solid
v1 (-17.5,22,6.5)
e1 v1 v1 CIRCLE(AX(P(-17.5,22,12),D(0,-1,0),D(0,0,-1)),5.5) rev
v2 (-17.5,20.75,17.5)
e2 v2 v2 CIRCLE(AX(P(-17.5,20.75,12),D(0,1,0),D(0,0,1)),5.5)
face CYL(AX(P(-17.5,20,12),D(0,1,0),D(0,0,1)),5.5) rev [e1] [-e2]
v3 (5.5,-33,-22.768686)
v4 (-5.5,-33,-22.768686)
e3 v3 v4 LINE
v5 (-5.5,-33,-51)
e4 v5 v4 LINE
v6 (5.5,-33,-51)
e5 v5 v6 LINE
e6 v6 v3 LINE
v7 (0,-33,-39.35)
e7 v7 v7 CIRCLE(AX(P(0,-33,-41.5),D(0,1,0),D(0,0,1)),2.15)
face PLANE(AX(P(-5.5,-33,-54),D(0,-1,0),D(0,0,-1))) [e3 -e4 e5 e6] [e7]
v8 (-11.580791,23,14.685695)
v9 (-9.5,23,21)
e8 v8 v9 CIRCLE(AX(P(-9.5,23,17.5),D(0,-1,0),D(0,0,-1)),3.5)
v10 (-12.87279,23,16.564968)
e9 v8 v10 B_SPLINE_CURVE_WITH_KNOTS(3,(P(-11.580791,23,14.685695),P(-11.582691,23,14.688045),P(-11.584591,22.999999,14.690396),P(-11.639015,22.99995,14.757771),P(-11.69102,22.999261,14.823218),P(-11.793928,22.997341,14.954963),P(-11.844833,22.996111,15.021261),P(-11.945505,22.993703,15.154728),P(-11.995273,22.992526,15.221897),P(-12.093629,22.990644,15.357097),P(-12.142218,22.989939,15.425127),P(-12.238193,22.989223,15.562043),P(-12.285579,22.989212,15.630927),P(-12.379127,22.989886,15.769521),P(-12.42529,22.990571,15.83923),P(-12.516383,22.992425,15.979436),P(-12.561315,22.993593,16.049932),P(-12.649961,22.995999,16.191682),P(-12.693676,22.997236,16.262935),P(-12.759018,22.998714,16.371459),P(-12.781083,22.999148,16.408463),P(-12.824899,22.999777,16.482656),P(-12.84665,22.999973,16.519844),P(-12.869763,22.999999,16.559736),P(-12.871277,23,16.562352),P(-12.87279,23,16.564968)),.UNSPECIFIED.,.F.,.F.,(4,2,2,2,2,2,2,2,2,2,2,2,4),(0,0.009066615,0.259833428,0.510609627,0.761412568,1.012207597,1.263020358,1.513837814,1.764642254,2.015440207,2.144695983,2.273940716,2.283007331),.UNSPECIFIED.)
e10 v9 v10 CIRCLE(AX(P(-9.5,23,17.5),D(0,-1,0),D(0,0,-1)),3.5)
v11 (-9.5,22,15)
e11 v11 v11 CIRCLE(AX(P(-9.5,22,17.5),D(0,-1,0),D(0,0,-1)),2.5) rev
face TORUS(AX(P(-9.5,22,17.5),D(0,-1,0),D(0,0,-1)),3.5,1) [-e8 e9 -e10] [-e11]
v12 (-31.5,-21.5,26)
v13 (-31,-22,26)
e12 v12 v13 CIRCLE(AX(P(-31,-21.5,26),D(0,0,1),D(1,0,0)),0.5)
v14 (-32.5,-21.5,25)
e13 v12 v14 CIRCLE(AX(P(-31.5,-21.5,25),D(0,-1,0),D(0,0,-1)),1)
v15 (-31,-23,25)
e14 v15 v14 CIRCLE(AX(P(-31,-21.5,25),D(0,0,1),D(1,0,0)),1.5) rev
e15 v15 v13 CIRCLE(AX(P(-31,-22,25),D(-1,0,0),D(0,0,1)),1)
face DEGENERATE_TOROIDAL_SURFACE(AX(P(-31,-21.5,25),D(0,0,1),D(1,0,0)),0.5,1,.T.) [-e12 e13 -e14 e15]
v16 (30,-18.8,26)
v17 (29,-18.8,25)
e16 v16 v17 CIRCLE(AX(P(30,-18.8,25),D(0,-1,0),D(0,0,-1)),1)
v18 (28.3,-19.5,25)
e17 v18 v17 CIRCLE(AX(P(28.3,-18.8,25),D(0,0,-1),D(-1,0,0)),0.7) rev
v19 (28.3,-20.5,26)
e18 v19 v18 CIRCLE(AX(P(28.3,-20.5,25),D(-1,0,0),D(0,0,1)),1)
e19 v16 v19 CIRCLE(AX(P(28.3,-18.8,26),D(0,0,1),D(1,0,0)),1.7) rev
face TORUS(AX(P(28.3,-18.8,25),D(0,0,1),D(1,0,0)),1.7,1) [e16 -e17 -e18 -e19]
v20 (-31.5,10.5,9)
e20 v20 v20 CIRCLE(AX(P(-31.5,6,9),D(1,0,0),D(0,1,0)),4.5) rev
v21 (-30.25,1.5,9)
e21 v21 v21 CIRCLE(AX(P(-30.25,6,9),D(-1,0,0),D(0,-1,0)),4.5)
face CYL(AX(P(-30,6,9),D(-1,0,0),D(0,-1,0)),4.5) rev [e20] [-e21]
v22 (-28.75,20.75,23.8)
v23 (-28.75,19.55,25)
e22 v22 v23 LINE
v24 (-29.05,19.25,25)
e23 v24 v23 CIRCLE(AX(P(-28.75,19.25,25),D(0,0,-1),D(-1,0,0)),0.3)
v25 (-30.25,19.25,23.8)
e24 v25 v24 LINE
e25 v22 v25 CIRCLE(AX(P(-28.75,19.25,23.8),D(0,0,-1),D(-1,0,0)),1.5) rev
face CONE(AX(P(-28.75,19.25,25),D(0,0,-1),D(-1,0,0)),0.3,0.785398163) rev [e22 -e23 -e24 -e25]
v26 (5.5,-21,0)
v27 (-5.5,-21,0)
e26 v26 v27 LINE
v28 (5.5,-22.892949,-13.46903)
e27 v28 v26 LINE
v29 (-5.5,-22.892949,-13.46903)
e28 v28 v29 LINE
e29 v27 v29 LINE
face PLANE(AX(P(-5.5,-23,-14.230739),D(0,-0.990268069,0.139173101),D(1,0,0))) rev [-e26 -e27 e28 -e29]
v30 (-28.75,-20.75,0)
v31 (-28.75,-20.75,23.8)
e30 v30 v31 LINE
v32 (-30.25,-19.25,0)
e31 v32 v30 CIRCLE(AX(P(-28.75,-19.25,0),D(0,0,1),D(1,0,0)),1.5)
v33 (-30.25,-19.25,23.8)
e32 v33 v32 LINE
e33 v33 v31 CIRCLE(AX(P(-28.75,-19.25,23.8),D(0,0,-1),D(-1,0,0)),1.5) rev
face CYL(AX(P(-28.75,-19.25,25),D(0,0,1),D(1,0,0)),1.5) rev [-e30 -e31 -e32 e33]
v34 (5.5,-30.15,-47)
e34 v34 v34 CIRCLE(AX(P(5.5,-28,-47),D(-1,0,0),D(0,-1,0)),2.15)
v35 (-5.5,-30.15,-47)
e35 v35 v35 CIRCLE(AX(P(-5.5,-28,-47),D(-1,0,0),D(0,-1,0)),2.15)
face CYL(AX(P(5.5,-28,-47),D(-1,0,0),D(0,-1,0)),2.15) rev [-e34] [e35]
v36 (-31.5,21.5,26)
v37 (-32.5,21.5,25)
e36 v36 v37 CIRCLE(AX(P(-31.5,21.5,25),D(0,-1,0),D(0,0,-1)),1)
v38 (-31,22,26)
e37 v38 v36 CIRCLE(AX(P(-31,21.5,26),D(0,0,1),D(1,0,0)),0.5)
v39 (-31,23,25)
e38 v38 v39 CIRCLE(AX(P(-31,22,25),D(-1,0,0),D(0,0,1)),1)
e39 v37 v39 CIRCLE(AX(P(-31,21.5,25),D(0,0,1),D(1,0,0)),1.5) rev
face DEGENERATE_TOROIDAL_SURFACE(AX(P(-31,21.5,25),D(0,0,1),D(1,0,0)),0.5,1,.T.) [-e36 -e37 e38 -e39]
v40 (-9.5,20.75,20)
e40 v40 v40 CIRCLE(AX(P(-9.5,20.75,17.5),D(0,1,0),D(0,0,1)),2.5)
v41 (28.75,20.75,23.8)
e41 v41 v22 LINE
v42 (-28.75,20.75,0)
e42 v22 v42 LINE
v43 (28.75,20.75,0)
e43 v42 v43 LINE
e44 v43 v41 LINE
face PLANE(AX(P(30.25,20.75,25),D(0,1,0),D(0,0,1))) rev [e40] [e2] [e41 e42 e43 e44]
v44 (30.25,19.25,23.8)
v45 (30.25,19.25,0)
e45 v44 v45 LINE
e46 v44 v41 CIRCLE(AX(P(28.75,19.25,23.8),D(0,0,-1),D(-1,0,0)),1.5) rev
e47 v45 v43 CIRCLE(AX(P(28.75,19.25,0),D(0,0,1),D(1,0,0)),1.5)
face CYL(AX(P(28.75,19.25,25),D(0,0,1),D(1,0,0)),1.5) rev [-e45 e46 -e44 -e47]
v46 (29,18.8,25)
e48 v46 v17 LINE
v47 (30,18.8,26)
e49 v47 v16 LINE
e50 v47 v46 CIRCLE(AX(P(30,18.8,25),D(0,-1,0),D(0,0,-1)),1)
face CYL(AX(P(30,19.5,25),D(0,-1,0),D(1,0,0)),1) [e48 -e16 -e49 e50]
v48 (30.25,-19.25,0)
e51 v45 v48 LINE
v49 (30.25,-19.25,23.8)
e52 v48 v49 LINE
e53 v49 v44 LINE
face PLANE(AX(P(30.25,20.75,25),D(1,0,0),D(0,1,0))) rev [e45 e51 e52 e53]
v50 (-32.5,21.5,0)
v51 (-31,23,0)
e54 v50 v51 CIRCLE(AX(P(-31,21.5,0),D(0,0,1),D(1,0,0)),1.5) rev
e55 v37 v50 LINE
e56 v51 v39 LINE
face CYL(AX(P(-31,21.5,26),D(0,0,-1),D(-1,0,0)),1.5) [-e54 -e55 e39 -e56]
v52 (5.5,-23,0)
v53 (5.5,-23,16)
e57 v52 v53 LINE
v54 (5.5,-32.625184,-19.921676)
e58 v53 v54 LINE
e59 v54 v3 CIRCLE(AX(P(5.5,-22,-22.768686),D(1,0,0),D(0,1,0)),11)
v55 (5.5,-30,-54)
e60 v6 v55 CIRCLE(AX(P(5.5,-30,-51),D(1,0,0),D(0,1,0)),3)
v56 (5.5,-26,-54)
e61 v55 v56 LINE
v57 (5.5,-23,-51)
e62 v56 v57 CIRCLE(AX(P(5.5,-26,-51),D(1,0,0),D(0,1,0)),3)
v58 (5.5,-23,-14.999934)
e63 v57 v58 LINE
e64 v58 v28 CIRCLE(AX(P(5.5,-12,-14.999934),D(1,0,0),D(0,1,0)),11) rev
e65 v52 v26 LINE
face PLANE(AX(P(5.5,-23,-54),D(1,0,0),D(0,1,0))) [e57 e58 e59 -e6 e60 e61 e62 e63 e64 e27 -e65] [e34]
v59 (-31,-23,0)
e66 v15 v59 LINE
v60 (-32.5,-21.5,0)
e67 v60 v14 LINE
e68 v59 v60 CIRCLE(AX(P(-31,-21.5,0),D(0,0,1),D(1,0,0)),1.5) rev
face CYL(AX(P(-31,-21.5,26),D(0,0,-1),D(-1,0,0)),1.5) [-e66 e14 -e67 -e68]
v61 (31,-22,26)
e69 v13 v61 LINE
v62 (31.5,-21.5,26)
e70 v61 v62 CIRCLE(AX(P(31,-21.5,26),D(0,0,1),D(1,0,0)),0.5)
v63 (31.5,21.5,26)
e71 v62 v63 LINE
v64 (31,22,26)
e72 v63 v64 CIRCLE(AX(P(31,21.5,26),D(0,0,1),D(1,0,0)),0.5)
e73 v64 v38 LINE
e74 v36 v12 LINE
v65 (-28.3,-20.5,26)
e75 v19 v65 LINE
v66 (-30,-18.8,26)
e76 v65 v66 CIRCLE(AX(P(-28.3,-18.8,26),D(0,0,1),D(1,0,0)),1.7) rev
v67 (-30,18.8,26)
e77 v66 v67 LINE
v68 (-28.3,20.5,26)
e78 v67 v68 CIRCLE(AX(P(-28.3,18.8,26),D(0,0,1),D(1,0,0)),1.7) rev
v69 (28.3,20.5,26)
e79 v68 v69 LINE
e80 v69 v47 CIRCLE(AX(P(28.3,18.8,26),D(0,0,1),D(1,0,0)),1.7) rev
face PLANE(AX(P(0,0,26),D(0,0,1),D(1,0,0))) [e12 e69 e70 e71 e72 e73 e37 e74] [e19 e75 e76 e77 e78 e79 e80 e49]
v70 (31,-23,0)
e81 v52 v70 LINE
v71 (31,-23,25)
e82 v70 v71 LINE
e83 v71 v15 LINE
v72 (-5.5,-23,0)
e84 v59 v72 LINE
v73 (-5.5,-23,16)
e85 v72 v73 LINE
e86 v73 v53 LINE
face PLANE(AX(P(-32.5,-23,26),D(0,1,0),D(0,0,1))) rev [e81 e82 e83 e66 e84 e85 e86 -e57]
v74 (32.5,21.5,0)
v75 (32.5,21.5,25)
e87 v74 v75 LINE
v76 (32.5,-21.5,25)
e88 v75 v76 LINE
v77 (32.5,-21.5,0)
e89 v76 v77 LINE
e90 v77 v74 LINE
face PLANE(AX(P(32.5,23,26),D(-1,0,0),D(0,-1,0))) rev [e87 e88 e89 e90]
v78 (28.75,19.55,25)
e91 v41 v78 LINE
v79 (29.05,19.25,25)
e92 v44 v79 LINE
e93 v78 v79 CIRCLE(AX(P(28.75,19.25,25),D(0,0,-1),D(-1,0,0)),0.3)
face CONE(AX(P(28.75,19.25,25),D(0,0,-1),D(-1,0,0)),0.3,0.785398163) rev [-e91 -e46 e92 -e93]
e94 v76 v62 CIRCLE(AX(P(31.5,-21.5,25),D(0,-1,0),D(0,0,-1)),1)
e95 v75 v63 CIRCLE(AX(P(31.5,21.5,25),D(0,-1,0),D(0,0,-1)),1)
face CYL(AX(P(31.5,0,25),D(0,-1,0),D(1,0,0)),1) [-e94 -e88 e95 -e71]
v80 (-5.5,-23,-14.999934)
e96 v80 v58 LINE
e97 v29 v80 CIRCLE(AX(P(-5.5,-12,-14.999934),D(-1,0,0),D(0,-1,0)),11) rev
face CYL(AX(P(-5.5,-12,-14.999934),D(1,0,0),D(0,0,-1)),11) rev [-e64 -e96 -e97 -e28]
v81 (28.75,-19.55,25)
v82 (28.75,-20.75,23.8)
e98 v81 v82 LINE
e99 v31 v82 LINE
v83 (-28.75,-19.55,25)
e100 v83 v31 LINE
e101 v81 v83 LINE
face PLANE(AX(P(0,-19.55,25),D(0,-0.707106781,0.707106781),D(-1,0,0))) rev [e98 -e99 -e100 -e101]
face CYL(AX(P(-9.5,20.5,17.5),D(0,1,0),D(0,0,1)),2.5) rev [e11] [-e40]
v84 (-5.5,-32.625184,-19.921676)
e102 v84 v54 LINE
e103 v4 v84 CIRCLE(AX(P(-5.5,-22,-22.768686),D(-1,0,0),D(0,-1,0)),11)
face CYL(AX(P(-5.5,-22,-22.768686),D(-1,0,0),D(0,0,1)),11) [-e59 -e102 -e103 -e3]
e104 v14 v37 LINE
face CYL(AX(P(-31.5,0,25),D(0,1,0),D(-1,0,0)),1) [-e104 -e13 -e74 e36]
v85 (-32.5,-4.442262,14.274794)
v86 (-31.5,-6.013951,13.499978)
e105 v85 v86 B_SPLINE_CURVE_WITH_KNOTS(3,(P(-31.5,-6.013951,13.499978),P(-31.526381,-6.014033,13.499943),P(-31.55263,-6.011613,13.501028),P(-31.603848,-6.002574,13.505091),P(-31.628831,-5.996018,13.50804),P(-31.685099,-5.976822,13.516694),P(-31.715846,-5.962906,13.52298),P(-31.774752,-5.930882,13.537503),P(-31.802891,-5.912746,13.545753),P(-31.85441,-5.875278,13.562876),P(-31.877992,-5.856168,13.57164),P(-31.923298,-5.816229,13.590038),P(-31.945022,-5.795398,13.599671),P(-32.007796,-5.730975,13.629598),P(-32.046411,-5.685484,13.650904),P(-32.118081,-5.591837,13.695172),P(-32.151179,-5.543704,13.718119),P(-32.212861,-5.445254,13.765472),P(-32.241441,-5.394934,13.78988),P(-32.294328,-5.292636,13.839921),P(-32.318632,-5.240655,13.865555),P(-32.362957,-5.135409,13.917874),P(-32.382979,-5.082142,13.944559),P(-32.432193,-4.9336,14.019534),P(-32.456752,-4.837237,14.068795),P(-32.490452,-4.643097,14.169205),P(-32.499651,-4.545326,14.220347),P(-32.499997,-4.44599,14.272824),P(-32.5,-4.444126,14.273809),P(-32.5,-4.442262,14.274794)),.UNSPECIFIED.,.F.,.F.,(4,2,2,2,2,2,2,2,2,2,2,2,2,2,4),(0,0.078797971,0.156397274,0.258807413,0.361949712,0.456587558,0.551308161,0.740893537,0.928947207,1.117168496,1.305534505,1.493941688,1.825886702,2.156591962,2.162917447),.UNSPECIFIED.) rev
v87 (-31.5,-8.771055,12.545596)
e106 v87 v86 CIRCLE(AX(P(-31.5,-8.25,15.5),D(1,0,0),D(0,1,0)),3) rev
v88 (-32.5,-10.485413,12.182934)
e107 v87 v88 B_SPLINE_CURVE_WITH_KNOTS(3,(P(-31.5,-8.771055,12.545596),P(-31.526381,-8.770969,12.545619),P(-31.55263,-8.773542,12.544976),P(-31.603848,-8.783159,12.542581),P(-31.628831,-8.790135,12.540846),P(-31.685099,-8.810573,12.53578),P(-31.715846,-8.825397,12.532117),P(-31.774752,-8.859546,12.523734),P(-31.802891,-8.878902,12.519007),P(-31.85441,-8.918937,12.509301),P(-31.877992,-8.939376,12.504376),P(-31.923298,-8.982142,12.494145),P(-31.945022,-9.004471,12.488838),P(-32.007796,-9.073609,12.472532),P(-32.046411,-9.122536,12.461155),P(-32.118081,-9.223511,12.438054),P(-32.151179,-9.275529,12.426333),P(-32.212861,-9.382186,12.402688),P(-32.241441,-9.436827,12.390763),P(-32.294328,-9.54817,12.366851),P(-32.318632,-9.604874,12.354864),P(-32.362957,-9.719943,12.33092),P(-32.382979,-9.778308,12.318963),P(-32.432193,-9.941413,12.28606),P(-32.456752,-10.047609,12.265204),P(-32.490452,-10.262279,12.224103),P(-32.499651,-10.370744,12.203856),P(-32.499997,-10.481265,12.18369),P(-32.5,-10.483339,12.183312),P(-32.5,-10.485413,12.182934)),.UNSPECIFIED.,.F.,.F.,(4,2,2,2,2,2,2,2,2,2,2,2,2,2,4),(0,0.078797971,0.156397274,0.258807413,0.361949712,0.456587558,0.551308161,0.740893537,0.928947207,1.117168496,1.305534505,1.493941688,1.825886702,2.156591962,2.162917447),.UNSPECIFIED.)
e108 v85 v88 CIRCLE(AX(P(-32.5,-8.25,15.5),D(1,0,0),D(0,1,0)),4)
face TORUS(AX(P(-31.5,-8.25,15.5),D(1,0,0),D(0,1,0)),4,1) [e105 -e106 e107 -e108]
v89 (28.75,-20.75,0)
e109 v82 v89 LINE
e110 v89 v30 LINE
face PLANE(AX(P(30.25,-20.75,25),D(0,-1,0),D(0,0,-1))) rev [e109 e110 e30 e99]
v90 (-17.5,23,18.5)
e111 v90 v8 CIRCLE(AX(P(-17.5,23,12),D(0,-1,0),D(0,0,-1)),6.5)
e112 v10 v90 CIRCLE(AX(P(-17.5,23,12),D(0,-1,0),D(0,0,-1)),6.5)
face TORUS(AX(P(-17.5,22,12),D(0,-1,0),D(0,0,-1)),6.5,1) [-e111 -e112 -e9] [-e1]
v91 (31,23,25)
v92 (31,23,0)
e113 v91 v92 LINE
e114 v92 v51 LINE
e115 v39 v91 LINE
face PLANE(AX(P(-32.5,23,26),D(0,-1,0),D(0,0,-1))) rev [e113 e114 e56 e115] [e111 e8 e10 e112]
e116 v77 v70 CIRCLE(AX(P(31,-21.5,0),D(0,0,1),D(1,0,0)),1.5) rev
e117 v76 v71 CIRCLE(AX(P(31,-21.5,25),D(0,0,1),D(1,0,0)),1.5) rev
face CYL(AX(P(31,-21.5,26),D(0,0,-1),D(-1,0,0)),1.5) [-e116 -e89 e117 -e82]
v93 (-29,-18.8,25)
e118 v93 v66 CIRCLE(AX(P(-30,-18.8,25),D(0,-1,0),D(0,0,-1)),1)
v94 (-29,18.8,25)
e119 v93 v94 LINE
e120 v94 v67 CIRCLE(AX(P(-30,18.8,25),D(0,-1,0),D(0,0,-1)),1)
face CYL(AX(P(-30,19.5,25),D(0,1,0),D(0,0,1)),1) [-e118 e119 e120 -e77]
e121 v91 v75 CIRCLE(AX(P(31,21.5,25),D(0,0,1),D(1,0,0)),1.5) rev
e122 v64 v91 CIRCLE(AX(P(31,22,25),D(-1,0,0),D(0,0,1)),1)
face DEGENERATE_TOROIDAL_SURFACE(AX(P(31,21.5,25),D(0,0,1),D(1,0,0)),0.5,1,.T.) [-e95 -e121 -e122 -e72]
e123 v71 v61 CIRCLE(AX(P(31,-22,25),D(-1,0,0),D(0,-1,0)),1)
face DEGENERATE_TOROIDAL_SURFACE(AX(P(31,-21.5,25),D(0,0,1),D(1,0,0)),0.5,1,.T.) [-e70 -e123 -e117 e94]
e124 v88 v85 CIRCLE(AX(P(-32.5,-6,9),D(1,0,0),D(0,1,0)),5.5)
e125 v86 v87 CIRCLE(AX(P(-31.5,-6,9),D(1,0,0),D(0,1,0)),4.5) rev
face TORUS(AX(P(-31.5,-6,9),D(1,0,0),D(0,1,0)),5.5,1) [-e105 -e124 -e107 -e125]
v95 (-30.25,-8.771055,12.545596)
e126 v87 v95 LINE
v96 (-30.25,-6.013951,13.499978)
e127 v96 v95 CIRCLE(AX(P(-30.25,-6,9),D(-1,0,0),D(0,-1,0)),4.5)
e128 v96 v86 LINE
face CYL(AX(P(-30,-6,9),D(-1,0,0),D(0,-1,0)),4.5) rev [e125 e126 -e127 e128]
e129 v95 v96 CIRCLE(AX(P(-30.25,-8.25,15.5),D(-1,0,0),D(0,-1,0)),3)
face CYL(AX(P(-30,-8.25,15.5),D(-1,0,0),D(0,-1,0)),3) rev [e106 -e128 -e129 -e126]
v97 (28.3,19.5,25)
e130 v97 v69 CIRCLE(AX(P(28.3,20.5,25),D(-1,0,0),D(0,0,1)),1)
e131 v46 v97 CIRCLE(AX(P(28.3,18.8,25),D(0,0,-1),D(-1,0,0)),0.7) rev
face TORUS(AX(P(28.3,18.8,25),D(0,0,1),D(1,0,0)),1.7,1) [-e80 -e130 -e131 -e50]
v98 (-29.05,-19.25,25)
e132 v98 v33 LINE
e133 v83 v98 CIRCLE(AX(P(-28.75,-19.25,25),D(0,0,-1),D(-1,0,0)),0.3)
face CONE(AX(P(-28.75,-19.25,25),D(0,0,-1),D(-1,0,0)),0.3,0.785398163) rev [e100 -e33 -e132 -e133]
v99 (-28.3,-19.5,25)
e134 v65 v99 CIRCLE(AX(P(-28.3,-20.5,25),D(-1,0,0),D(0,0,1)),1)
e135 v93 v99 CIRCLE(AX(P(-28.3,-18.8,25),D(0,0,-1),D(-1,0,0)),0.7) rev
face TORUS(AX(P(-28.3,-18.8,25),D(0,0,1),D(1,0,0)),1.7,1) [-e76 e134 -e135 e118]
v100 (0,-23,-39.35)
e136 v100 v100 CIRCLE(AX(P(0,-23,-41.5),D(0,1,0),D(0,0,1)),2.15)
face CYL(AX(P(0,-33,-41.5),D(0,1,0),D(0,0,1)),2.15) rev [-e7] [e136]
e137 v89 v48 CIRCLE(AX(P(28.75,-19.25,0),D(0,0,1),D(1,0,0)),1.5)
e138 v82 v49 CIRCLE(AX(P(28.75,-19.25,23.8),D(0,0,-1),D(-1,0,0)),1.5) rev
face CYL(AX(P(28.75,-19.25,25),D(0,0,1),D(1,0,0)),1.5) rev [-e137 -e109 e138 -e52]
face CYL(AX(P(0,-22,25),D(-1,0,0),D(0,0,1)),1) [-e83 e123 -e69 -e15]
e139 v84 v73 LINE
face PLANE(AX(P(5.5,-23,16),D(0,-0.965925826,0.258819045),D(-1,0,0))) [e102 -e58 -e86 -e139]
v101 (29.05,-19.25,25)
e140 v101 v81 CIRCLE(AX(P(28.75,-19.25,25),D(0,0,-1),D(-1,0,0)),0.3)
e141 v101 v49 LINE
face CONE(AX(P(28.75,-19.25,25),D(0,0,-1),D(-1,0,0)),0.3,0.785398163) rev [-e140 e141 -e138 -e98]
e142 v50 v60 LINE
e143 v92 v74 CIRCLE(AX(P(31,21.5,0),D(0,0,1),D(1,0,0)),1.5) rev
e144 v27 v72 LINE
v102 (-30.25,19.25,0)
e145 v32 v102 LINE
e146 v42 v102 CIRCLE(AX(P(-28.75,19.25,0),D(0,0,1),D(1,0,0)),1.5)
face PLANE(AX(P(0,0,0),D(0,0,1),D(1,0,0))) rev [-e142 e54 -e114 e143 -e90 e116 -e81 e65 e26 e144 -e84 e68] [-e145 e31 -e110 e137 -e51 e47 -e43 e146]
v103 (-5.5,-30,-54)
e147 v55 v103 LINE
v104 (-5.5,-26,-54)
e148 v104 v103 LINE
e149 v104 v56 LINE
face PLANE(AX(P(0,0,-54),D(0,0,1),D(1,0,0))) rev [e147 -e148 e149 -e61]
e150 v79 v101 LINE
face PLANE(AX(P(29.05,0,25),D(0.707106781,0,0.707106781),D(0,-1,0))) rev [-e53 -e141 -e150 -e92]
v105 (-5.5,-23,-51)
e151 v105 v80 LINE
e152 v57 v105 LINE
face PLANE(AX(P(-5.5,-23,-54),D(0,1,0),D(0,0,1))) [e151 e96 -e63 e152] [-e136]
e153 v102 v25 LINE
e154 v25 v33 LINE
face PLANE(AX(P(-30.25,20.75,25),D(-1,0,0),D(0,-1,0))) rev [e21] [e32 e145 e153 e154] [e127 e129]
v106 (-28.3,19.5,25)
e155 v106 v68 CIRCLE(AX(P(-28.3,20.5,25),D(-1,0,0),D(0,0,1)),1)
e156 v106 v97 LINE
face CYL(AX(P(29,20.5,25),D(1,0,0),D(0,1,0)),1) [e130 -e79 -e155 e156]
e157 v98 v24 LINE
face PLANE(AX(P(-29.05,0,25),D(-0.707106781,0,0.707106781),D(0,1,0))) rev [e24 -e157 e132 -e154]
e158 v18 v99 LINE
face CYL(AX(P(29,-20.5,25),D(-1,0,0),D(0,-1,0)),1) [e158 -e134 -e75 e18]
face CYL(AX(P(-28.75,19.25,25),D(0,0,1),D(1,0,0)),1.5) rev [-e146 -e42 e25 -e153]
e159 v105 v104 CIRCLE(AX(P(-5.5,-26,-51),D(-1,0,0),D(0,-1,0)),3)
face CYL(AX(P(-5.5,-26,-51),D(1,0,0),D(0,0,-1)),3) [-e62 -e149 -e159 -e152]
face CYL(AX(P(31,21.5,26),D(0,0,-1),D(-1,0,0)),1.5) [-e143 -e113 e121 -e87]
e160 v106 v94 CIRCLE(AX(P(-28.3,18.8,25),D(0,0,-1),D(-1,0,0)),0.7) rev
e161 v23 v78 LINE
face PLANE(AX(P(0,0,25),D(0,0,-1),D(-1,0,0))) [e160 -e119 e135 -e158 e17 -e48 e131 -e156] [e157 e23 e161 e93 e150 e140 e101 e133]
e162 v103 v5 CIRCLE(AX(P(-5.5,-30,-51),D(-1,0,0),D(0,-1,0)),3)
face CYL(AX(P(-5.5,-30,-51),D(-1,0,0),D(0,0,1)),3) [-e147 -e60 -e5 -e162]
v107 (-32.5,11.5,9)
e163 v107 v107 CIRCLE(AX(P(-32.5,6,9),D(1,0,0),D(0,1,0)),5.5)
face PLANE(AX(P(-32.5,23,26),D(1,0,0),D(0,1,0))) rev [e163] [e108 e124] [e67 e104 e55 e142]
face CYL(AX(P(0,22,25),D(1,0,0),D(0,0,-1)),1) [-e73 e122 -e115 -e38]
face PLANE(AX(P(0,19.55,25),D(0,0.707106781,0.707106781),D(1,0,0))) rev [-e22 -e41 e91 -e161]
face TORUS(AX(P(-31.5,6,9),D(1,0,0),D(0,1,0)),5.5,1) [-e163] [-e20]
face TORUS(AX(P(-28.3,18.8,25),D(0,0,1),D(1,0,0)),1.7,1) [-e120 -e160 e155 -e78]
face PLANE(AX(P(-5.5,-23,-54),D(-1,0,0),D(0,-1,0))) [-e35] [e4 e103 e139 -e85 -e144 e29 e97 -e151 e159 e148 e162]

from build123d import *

# Parameters (mm, degrees)
SKETCH1_W           = 65
SKETCH1_H           = 46
BOSS_EXTRUDE1_DEPTH = 26
SKETCH2_W           = 60.5
SKETCH2_H           = 41.5
CUT_EXTRUDE1_DEPTH  = 25
SKETCH3_W           = 58
SKETCH3_H           = 39
CUT_EXTRUDE2_DEPTH  = 2
SKETCH4_R           = 5.5
CUT_EXTRUDE3_DEPTH  = 3
SKETCH6_R           = 4.5
CUT_EXTRUDE4_DEPTH  = 2.5
SKETCH7_R           = 3
CUT_EXTRUDE5_DEPTH  = 2.5
SKETCH8_R           = 2.5
CUT_EXTRUDE6_DEPTH  = 2.5
FILLET1_R           = 1
FILLET2_R           = 1.5
FILLET4_R           = 0.7
CHAMFER2_SIZE       = 1.2
SKETCH9_W           = 11
SKETCH9_H           = 10
BOSS_EXTRUDE2_DEPTH = 80
SKETCH10_R          = 2.15
CUT_EXTRUDE7_DEPTH  = 11
FILLET5_R           = 3
CHAMFER4_SIZE       = 2
CHAMFER4_SIZE2      = 14.230739445
SKETCH12_W          = 11
SKETCH12_H          = 10
CUT_EXTRUDE9_DEPTH  = 10
CHAMFER5_SIZE2      = 10
CHAMFER5_SIZE       = 37.320508076
FILLET10_R          = 1
SKETCH13_R          = 2.15
CUT_EXTRUDE10_DEPTH = 10
FILLET11_R          = 11


# Some blends are built 0.0001 mm under size
with BuildPart() as part:
    # Sketch1 → Boss-Extrude1 (new body)
    with BuildSketch(Plane.XY):
        Rectangle(SKETCH1_W, SKETCH1_H)
    extrude(amount=BOSS_EXTRUDE1_DEPTH)

    # Sketch2 → Cut-Extrude1 (cut)
    with BuildSketch(Plane(origin=(0, 0, 0), x_dir=(-1, 0, 0), z_dir=(0, 0, -1))):
        Rectangle(SKETCH2_W, SKETCH2_H)
    extrude(amount=-CUT_EXTRUDE1_DEPTH, mode=Mode.SUBTRACT)

    # Sketch3 → Cut-Extrude2 (cut)
    with BuildSketch(Plane(origin=(0, 0, 25), x_dir=(-1, 0, 0), z_dir=(0, 0, -1))):
        Rectangle(SKETCH3_W, SKETCH3_H)
    extrude(amount=-CUT_EXTRUDE2_DEPTH, mode=Mode.SUBTRACT)

    # Sketch4 → Cut-Extrude3 (cut)
    with BuildSketch(Plane(origin=(0, 23, 0), x_dir=(1, 0, 0), z_dir=(0, 1, 0))):
        with Locations(Location((-17.5, -12, 0), (0, 0, 270))):
            Circle(SKETCH4_R)
    extrude(amount=-CUT_EXTRUDE3_DEPTH, mode=Mode.SUBTRACT)

    # Sketch6 → Cut-Extrude4 (cut)
    with BuildSketch(Plane.ZY.offset(32.5)):
        with Locations(Location((9, 6, 0), (0, 0, 270))):
            Circle(SKETCH6_R)
        with Locations(Location((9, -6, 0), (0, 0, 270))):
            Circle(SKETCH6_R)
    extrude(amount=-CUT_EXTRUDE4_DEPTH, mode=Mode.SUBTRACT)

    # Sketch7 → Cut-Extrude5 (cut)
    with BuildSketch(Plane.ZY.offset(32.5)):
        with Locations((15.5, -8.25)):
            Circle(SKETCH7_R)
    extrude(amount=-CUT_EXTRUDE5_DEPTH, mode=Mode.SUBTRACT)

    # Sketch8 → Cut-Extrude6 (cut)
    with BuildSketch(Plane(origin=(0, 23, 0), x_dir=(1, 0, 0), z_dir=(0, 1, 0))):
        with Locations(Location((-9.5, -17.5, 0), (0, 0, 270))):
            Circle(SKETCH8_R)
    extrude(amount=-CUT_EXTRUDE6_DEPTH, mode=Mode.SUBTRACT)

    # Fillet1
    # the kernel refuses this fillet: 1 mm, written as the material it takes off along each edge
    with BuildSketch(Plane(origin=(-17.5, 23, 12), x_dir=(0, 0, 1), z_dir=(-1, 0, 0))) as fillet1_piece_1:
        with BuildLine():
            CenterArc((5.5 + FILLET1_R, -FILLET1_R), FILLET1_R, 90, 90)
            Line((5.5, -FILLET1_R), (5.5, 0))
            Line((5.5, 0), (5.5 + FILLET1_R, 0))
        make_face()
    revolve(axis=Axis((-17.5, 23, 12), (0, 1, 0)), mode=Mode.SUBTRACT)
    with BuildSketch(Plane(origin=(-32.5, 6, 9), x_dir=(0, -1, 0), z_dir=(0, 0, -1))) as fillet1_piece_2:
        with BuildLine():
            CenterArc((4.5 + FILLET1_R, -FILLET1_R), FILLET1_R, 90, 90)
            Line((4.5, -FILLET1_R), (4.5, 0))
            Line((4.5, 0), (4.5 + FILLET1_R, 0))
        make_face()
    revolve(axis=Axis((-32.5, 6, 9), (-1, 0, 0)), mode=Mode.SUBTRACT)
    with BuildSketch(Plane(origin=(-32.5, -6, 9), x_dir=(0, -0.33007770608121106, 0.9439537636707455), z_dir=(0, 0.9439537636707455, 0.33007770608121106))) as fillet1_piece_3:
        with BuildLine():
            CenterArc((4.5 + FILLET1_R, FILLET1_R), FILLET1_R, 180, 90)
            Line((4.5, FILLET1_R), (4.5, 0))
            Line((4.5, 0), (4.5 + FILLET1_R, 0))
        make_face()
    revolve(axis=Axis((-32.5, -6, 9), (1, 0, 0)), revolution_arc=359.64, mode=Mode.SUBTRACT)
    with BuildSketch(Plane(origin=(-32.5, -8.25, 15.5), x_dir=(0, 0.3300777060812122, -0.9439537636707451), z_dir=(0, -0.9439537636707451, -0.3300777060812122))) as fillet1_piece_4:
        with BuildLine():
            CenterArc((3 + FILLET1_R, FILLET1_R), FILLET1_R, 180, 90)
            Line((3, FILLET1_R), (3, 0))
            Line((3, 0), (3 + FILLET1_R, 0))
        make_face()
    revolve(axis=Axis((-32.5, -8.25, 15.5), (1, 0, 0)), revolution_arc=359.64, mode=Mode.SUBTRACT)
    with BuildSketch(Plane(origin=(-9.5, 23, 17.5), x_dir=(0, 0, 1), z_dir=(-1, 0, 0))) as fillet1_piece_5:
        with BuildLine():
            CenterArc((2.5 + FILLET1_R, -FILLET1_R), FILLET1_R, 90, 90)
            Line((2.5, -FILLET1_R), (2.5, 0))
            Line((2.5, 0), (2.5 + FILLET1_R, 0))
        make_face()
    revolve(axis=Axis((-9.5, 23, 17.5), (0, 1, 0)), mode=Mode.SUBTRACT)

    # Fillet2
    fillet2_edges = [part.edges().sort_by_distance(p)[0] for p in [
        (-30.25, 20.75, 12.5),
        (-30.25, -20.75, 12.5),
        (30.25, -20.75, 12.5),
        (30.25, 20.75, 12.5),
        (32.5, -23, 13),
        (-32.5, -23, 13),
        (-32.5, 23, 13),
        (32.5, 23, 13),
    ]]
    fillet(fillet2_edges, radius=FILLET2_R)

    # Fillet4
    fillet4_edges = [part.edges().sort_by_distance(p)[0] for p in [
        (-29, 19.5, 25.5),
        (-29, -19.5, 25.5),
        (29, -19.5, 25.5),
        (29, 19.5, 25.5),
    ]]
    fillet(fillet4_edges, radius=FILLET4_R)

    # Chamfer2
    chamfer2_edges = [part.edges().sort_by_distance(p)[0] for p in [
        (-29.810660172, 20.310660172, 25),
        (-29.810660172, -20.310660172, 25),
        (29.810660172, -20.310660172, 25),
        (0, -20.75, 25),
        (30.25, 0, 25),
        (-30.25, 0, 25),
        (0, 20.75, 25),
        (29.810660172, 20.310660172, 25),
    ]]
    chamfer(chamfer2_edges, length=CHAMFER2_SIZE)

    # Sketch9 → Boss-Extrude2 (add)
    with BuildSketch(Plane.XY.offset(26)):
        with Locations((0, -28)):
            Rectangle(SKETCH9_W, SKETCH9_H)
    extrude(amount=-BOSS_EXTRUDE2_DEPTH)

    # Sketch10 → Cut-Extrude7 (cut)
    with BuildSketch(Plane.ZY.offset(5.5)):
        with Locations(Location((-47, -28, 0), (0, 0, 270))):
            Circle(SKETCH10_R)
    extrude(amount=-CUT_EXTRUDE7_DEPTH, mode=Mode.SUBTRACT)

    # Fillet5
    fillet5_edges = [part.edges().sort_by_distance(p)[0] for p in [
        (0, -23, -54),
        (0, -33, -54),
    ]]
    fillet(fillet5_edges, radius=FILLET5_R)

    # Chamfer4
    chamfer4_edges = [part.edges().sort_by_distance(p)[0] for p in [
        (0, -23, 0),
    ]]
    chamfer4_side = [part.faces().sort_by_distance(p)[0] for p in [
        (0, 22.203696038, 0),
    ]]
    chamfer(chamfer4_edges, length=CHAMFER4_SIZE, length2=CHAMFER4_SIZE2, reference=chamfer4_side[0])

    # Sketch12 → Cut-Extrude9 (cut)
    with BuildSketch(Plane.XZ.offset(33)):
        with Locations((0, 21)):
            Rectangle(SKETCH12_W, SKETCH12_H)
    extrude(amount=-CUT_EXTRUDE9_DEPTH, mode=Mode.SUBTRACT)

    # Chamfer5
    chamfer5_edges = [part.edges().sort_by_distance(p)[0] for p in [
        (0, -33, 16),
    ]]
    chamfer5_side = [part.faces().sort_by_distance(p)[0] for p in [
        (0, -33, 15.8),
    ]]
    chamfer(chamfer5_edges, length=CHAMFER5_SIZE - 0.0001, length2=CHAMFER5_SIZE2 - 0.0001, reference=chamfer5_side[0])  # a hair under: the kernel refuses the full size

    # Fillet10
    fillet10_edges = [part.edges().sort_by_distance(p)[0] for p in [
        (28.794974747, -19.294974747, 26),
        (29, 0, 26),
        (28.794974747, 19.294974747, 26),
        (0, 19.5, 26),
        (-28.794974747, 19.294974747, 26),
        (-29, 0, 26),
        (-28.794974747, -19.294974747, 26),
        (0, -19.5, 26),
        (-32.060660172, -22.560660172, 26),
        (-32.5, 0, 26),
        (-32.060660172, 22.560660172, 26),
        (0, 23, 26),
        (32.060660172, 22.560660172, 26),
        (32.5, 0, 26),
        (32.060660172, -22.560660172, 26),
        (0, -23, 26),
    ]]
    fillet(fillet10_edges, radius=FILLET10_R - 0.0001)  # a hair under: the kernel refuses the full size

    # Sketch13 → Cut-Extrude10 (cut)
    with BuildSketch(Plane(origin=(0, -23, 0), x_dir=(1, 0, 0), z_dir=(0, 1, 0))):
        with Locations(Location((0, 41.5, 0), (0, 0, 270))):
            Circle(SKETCH13_R)
    extrude(amount=-CUT_EXTRUDE10_DEPTH, mode=Mode.SUBTRACT)

    # Fillet11
    fillet11_edges = [part.edges().sort_by_distance(p)[0] for p in [
        (0, -23, -14.230739445),
        (0, -33, -21.320408076),
    ]]
    fillet(fillet11_edges, radius=FILLET11_R)


solid = part.part
